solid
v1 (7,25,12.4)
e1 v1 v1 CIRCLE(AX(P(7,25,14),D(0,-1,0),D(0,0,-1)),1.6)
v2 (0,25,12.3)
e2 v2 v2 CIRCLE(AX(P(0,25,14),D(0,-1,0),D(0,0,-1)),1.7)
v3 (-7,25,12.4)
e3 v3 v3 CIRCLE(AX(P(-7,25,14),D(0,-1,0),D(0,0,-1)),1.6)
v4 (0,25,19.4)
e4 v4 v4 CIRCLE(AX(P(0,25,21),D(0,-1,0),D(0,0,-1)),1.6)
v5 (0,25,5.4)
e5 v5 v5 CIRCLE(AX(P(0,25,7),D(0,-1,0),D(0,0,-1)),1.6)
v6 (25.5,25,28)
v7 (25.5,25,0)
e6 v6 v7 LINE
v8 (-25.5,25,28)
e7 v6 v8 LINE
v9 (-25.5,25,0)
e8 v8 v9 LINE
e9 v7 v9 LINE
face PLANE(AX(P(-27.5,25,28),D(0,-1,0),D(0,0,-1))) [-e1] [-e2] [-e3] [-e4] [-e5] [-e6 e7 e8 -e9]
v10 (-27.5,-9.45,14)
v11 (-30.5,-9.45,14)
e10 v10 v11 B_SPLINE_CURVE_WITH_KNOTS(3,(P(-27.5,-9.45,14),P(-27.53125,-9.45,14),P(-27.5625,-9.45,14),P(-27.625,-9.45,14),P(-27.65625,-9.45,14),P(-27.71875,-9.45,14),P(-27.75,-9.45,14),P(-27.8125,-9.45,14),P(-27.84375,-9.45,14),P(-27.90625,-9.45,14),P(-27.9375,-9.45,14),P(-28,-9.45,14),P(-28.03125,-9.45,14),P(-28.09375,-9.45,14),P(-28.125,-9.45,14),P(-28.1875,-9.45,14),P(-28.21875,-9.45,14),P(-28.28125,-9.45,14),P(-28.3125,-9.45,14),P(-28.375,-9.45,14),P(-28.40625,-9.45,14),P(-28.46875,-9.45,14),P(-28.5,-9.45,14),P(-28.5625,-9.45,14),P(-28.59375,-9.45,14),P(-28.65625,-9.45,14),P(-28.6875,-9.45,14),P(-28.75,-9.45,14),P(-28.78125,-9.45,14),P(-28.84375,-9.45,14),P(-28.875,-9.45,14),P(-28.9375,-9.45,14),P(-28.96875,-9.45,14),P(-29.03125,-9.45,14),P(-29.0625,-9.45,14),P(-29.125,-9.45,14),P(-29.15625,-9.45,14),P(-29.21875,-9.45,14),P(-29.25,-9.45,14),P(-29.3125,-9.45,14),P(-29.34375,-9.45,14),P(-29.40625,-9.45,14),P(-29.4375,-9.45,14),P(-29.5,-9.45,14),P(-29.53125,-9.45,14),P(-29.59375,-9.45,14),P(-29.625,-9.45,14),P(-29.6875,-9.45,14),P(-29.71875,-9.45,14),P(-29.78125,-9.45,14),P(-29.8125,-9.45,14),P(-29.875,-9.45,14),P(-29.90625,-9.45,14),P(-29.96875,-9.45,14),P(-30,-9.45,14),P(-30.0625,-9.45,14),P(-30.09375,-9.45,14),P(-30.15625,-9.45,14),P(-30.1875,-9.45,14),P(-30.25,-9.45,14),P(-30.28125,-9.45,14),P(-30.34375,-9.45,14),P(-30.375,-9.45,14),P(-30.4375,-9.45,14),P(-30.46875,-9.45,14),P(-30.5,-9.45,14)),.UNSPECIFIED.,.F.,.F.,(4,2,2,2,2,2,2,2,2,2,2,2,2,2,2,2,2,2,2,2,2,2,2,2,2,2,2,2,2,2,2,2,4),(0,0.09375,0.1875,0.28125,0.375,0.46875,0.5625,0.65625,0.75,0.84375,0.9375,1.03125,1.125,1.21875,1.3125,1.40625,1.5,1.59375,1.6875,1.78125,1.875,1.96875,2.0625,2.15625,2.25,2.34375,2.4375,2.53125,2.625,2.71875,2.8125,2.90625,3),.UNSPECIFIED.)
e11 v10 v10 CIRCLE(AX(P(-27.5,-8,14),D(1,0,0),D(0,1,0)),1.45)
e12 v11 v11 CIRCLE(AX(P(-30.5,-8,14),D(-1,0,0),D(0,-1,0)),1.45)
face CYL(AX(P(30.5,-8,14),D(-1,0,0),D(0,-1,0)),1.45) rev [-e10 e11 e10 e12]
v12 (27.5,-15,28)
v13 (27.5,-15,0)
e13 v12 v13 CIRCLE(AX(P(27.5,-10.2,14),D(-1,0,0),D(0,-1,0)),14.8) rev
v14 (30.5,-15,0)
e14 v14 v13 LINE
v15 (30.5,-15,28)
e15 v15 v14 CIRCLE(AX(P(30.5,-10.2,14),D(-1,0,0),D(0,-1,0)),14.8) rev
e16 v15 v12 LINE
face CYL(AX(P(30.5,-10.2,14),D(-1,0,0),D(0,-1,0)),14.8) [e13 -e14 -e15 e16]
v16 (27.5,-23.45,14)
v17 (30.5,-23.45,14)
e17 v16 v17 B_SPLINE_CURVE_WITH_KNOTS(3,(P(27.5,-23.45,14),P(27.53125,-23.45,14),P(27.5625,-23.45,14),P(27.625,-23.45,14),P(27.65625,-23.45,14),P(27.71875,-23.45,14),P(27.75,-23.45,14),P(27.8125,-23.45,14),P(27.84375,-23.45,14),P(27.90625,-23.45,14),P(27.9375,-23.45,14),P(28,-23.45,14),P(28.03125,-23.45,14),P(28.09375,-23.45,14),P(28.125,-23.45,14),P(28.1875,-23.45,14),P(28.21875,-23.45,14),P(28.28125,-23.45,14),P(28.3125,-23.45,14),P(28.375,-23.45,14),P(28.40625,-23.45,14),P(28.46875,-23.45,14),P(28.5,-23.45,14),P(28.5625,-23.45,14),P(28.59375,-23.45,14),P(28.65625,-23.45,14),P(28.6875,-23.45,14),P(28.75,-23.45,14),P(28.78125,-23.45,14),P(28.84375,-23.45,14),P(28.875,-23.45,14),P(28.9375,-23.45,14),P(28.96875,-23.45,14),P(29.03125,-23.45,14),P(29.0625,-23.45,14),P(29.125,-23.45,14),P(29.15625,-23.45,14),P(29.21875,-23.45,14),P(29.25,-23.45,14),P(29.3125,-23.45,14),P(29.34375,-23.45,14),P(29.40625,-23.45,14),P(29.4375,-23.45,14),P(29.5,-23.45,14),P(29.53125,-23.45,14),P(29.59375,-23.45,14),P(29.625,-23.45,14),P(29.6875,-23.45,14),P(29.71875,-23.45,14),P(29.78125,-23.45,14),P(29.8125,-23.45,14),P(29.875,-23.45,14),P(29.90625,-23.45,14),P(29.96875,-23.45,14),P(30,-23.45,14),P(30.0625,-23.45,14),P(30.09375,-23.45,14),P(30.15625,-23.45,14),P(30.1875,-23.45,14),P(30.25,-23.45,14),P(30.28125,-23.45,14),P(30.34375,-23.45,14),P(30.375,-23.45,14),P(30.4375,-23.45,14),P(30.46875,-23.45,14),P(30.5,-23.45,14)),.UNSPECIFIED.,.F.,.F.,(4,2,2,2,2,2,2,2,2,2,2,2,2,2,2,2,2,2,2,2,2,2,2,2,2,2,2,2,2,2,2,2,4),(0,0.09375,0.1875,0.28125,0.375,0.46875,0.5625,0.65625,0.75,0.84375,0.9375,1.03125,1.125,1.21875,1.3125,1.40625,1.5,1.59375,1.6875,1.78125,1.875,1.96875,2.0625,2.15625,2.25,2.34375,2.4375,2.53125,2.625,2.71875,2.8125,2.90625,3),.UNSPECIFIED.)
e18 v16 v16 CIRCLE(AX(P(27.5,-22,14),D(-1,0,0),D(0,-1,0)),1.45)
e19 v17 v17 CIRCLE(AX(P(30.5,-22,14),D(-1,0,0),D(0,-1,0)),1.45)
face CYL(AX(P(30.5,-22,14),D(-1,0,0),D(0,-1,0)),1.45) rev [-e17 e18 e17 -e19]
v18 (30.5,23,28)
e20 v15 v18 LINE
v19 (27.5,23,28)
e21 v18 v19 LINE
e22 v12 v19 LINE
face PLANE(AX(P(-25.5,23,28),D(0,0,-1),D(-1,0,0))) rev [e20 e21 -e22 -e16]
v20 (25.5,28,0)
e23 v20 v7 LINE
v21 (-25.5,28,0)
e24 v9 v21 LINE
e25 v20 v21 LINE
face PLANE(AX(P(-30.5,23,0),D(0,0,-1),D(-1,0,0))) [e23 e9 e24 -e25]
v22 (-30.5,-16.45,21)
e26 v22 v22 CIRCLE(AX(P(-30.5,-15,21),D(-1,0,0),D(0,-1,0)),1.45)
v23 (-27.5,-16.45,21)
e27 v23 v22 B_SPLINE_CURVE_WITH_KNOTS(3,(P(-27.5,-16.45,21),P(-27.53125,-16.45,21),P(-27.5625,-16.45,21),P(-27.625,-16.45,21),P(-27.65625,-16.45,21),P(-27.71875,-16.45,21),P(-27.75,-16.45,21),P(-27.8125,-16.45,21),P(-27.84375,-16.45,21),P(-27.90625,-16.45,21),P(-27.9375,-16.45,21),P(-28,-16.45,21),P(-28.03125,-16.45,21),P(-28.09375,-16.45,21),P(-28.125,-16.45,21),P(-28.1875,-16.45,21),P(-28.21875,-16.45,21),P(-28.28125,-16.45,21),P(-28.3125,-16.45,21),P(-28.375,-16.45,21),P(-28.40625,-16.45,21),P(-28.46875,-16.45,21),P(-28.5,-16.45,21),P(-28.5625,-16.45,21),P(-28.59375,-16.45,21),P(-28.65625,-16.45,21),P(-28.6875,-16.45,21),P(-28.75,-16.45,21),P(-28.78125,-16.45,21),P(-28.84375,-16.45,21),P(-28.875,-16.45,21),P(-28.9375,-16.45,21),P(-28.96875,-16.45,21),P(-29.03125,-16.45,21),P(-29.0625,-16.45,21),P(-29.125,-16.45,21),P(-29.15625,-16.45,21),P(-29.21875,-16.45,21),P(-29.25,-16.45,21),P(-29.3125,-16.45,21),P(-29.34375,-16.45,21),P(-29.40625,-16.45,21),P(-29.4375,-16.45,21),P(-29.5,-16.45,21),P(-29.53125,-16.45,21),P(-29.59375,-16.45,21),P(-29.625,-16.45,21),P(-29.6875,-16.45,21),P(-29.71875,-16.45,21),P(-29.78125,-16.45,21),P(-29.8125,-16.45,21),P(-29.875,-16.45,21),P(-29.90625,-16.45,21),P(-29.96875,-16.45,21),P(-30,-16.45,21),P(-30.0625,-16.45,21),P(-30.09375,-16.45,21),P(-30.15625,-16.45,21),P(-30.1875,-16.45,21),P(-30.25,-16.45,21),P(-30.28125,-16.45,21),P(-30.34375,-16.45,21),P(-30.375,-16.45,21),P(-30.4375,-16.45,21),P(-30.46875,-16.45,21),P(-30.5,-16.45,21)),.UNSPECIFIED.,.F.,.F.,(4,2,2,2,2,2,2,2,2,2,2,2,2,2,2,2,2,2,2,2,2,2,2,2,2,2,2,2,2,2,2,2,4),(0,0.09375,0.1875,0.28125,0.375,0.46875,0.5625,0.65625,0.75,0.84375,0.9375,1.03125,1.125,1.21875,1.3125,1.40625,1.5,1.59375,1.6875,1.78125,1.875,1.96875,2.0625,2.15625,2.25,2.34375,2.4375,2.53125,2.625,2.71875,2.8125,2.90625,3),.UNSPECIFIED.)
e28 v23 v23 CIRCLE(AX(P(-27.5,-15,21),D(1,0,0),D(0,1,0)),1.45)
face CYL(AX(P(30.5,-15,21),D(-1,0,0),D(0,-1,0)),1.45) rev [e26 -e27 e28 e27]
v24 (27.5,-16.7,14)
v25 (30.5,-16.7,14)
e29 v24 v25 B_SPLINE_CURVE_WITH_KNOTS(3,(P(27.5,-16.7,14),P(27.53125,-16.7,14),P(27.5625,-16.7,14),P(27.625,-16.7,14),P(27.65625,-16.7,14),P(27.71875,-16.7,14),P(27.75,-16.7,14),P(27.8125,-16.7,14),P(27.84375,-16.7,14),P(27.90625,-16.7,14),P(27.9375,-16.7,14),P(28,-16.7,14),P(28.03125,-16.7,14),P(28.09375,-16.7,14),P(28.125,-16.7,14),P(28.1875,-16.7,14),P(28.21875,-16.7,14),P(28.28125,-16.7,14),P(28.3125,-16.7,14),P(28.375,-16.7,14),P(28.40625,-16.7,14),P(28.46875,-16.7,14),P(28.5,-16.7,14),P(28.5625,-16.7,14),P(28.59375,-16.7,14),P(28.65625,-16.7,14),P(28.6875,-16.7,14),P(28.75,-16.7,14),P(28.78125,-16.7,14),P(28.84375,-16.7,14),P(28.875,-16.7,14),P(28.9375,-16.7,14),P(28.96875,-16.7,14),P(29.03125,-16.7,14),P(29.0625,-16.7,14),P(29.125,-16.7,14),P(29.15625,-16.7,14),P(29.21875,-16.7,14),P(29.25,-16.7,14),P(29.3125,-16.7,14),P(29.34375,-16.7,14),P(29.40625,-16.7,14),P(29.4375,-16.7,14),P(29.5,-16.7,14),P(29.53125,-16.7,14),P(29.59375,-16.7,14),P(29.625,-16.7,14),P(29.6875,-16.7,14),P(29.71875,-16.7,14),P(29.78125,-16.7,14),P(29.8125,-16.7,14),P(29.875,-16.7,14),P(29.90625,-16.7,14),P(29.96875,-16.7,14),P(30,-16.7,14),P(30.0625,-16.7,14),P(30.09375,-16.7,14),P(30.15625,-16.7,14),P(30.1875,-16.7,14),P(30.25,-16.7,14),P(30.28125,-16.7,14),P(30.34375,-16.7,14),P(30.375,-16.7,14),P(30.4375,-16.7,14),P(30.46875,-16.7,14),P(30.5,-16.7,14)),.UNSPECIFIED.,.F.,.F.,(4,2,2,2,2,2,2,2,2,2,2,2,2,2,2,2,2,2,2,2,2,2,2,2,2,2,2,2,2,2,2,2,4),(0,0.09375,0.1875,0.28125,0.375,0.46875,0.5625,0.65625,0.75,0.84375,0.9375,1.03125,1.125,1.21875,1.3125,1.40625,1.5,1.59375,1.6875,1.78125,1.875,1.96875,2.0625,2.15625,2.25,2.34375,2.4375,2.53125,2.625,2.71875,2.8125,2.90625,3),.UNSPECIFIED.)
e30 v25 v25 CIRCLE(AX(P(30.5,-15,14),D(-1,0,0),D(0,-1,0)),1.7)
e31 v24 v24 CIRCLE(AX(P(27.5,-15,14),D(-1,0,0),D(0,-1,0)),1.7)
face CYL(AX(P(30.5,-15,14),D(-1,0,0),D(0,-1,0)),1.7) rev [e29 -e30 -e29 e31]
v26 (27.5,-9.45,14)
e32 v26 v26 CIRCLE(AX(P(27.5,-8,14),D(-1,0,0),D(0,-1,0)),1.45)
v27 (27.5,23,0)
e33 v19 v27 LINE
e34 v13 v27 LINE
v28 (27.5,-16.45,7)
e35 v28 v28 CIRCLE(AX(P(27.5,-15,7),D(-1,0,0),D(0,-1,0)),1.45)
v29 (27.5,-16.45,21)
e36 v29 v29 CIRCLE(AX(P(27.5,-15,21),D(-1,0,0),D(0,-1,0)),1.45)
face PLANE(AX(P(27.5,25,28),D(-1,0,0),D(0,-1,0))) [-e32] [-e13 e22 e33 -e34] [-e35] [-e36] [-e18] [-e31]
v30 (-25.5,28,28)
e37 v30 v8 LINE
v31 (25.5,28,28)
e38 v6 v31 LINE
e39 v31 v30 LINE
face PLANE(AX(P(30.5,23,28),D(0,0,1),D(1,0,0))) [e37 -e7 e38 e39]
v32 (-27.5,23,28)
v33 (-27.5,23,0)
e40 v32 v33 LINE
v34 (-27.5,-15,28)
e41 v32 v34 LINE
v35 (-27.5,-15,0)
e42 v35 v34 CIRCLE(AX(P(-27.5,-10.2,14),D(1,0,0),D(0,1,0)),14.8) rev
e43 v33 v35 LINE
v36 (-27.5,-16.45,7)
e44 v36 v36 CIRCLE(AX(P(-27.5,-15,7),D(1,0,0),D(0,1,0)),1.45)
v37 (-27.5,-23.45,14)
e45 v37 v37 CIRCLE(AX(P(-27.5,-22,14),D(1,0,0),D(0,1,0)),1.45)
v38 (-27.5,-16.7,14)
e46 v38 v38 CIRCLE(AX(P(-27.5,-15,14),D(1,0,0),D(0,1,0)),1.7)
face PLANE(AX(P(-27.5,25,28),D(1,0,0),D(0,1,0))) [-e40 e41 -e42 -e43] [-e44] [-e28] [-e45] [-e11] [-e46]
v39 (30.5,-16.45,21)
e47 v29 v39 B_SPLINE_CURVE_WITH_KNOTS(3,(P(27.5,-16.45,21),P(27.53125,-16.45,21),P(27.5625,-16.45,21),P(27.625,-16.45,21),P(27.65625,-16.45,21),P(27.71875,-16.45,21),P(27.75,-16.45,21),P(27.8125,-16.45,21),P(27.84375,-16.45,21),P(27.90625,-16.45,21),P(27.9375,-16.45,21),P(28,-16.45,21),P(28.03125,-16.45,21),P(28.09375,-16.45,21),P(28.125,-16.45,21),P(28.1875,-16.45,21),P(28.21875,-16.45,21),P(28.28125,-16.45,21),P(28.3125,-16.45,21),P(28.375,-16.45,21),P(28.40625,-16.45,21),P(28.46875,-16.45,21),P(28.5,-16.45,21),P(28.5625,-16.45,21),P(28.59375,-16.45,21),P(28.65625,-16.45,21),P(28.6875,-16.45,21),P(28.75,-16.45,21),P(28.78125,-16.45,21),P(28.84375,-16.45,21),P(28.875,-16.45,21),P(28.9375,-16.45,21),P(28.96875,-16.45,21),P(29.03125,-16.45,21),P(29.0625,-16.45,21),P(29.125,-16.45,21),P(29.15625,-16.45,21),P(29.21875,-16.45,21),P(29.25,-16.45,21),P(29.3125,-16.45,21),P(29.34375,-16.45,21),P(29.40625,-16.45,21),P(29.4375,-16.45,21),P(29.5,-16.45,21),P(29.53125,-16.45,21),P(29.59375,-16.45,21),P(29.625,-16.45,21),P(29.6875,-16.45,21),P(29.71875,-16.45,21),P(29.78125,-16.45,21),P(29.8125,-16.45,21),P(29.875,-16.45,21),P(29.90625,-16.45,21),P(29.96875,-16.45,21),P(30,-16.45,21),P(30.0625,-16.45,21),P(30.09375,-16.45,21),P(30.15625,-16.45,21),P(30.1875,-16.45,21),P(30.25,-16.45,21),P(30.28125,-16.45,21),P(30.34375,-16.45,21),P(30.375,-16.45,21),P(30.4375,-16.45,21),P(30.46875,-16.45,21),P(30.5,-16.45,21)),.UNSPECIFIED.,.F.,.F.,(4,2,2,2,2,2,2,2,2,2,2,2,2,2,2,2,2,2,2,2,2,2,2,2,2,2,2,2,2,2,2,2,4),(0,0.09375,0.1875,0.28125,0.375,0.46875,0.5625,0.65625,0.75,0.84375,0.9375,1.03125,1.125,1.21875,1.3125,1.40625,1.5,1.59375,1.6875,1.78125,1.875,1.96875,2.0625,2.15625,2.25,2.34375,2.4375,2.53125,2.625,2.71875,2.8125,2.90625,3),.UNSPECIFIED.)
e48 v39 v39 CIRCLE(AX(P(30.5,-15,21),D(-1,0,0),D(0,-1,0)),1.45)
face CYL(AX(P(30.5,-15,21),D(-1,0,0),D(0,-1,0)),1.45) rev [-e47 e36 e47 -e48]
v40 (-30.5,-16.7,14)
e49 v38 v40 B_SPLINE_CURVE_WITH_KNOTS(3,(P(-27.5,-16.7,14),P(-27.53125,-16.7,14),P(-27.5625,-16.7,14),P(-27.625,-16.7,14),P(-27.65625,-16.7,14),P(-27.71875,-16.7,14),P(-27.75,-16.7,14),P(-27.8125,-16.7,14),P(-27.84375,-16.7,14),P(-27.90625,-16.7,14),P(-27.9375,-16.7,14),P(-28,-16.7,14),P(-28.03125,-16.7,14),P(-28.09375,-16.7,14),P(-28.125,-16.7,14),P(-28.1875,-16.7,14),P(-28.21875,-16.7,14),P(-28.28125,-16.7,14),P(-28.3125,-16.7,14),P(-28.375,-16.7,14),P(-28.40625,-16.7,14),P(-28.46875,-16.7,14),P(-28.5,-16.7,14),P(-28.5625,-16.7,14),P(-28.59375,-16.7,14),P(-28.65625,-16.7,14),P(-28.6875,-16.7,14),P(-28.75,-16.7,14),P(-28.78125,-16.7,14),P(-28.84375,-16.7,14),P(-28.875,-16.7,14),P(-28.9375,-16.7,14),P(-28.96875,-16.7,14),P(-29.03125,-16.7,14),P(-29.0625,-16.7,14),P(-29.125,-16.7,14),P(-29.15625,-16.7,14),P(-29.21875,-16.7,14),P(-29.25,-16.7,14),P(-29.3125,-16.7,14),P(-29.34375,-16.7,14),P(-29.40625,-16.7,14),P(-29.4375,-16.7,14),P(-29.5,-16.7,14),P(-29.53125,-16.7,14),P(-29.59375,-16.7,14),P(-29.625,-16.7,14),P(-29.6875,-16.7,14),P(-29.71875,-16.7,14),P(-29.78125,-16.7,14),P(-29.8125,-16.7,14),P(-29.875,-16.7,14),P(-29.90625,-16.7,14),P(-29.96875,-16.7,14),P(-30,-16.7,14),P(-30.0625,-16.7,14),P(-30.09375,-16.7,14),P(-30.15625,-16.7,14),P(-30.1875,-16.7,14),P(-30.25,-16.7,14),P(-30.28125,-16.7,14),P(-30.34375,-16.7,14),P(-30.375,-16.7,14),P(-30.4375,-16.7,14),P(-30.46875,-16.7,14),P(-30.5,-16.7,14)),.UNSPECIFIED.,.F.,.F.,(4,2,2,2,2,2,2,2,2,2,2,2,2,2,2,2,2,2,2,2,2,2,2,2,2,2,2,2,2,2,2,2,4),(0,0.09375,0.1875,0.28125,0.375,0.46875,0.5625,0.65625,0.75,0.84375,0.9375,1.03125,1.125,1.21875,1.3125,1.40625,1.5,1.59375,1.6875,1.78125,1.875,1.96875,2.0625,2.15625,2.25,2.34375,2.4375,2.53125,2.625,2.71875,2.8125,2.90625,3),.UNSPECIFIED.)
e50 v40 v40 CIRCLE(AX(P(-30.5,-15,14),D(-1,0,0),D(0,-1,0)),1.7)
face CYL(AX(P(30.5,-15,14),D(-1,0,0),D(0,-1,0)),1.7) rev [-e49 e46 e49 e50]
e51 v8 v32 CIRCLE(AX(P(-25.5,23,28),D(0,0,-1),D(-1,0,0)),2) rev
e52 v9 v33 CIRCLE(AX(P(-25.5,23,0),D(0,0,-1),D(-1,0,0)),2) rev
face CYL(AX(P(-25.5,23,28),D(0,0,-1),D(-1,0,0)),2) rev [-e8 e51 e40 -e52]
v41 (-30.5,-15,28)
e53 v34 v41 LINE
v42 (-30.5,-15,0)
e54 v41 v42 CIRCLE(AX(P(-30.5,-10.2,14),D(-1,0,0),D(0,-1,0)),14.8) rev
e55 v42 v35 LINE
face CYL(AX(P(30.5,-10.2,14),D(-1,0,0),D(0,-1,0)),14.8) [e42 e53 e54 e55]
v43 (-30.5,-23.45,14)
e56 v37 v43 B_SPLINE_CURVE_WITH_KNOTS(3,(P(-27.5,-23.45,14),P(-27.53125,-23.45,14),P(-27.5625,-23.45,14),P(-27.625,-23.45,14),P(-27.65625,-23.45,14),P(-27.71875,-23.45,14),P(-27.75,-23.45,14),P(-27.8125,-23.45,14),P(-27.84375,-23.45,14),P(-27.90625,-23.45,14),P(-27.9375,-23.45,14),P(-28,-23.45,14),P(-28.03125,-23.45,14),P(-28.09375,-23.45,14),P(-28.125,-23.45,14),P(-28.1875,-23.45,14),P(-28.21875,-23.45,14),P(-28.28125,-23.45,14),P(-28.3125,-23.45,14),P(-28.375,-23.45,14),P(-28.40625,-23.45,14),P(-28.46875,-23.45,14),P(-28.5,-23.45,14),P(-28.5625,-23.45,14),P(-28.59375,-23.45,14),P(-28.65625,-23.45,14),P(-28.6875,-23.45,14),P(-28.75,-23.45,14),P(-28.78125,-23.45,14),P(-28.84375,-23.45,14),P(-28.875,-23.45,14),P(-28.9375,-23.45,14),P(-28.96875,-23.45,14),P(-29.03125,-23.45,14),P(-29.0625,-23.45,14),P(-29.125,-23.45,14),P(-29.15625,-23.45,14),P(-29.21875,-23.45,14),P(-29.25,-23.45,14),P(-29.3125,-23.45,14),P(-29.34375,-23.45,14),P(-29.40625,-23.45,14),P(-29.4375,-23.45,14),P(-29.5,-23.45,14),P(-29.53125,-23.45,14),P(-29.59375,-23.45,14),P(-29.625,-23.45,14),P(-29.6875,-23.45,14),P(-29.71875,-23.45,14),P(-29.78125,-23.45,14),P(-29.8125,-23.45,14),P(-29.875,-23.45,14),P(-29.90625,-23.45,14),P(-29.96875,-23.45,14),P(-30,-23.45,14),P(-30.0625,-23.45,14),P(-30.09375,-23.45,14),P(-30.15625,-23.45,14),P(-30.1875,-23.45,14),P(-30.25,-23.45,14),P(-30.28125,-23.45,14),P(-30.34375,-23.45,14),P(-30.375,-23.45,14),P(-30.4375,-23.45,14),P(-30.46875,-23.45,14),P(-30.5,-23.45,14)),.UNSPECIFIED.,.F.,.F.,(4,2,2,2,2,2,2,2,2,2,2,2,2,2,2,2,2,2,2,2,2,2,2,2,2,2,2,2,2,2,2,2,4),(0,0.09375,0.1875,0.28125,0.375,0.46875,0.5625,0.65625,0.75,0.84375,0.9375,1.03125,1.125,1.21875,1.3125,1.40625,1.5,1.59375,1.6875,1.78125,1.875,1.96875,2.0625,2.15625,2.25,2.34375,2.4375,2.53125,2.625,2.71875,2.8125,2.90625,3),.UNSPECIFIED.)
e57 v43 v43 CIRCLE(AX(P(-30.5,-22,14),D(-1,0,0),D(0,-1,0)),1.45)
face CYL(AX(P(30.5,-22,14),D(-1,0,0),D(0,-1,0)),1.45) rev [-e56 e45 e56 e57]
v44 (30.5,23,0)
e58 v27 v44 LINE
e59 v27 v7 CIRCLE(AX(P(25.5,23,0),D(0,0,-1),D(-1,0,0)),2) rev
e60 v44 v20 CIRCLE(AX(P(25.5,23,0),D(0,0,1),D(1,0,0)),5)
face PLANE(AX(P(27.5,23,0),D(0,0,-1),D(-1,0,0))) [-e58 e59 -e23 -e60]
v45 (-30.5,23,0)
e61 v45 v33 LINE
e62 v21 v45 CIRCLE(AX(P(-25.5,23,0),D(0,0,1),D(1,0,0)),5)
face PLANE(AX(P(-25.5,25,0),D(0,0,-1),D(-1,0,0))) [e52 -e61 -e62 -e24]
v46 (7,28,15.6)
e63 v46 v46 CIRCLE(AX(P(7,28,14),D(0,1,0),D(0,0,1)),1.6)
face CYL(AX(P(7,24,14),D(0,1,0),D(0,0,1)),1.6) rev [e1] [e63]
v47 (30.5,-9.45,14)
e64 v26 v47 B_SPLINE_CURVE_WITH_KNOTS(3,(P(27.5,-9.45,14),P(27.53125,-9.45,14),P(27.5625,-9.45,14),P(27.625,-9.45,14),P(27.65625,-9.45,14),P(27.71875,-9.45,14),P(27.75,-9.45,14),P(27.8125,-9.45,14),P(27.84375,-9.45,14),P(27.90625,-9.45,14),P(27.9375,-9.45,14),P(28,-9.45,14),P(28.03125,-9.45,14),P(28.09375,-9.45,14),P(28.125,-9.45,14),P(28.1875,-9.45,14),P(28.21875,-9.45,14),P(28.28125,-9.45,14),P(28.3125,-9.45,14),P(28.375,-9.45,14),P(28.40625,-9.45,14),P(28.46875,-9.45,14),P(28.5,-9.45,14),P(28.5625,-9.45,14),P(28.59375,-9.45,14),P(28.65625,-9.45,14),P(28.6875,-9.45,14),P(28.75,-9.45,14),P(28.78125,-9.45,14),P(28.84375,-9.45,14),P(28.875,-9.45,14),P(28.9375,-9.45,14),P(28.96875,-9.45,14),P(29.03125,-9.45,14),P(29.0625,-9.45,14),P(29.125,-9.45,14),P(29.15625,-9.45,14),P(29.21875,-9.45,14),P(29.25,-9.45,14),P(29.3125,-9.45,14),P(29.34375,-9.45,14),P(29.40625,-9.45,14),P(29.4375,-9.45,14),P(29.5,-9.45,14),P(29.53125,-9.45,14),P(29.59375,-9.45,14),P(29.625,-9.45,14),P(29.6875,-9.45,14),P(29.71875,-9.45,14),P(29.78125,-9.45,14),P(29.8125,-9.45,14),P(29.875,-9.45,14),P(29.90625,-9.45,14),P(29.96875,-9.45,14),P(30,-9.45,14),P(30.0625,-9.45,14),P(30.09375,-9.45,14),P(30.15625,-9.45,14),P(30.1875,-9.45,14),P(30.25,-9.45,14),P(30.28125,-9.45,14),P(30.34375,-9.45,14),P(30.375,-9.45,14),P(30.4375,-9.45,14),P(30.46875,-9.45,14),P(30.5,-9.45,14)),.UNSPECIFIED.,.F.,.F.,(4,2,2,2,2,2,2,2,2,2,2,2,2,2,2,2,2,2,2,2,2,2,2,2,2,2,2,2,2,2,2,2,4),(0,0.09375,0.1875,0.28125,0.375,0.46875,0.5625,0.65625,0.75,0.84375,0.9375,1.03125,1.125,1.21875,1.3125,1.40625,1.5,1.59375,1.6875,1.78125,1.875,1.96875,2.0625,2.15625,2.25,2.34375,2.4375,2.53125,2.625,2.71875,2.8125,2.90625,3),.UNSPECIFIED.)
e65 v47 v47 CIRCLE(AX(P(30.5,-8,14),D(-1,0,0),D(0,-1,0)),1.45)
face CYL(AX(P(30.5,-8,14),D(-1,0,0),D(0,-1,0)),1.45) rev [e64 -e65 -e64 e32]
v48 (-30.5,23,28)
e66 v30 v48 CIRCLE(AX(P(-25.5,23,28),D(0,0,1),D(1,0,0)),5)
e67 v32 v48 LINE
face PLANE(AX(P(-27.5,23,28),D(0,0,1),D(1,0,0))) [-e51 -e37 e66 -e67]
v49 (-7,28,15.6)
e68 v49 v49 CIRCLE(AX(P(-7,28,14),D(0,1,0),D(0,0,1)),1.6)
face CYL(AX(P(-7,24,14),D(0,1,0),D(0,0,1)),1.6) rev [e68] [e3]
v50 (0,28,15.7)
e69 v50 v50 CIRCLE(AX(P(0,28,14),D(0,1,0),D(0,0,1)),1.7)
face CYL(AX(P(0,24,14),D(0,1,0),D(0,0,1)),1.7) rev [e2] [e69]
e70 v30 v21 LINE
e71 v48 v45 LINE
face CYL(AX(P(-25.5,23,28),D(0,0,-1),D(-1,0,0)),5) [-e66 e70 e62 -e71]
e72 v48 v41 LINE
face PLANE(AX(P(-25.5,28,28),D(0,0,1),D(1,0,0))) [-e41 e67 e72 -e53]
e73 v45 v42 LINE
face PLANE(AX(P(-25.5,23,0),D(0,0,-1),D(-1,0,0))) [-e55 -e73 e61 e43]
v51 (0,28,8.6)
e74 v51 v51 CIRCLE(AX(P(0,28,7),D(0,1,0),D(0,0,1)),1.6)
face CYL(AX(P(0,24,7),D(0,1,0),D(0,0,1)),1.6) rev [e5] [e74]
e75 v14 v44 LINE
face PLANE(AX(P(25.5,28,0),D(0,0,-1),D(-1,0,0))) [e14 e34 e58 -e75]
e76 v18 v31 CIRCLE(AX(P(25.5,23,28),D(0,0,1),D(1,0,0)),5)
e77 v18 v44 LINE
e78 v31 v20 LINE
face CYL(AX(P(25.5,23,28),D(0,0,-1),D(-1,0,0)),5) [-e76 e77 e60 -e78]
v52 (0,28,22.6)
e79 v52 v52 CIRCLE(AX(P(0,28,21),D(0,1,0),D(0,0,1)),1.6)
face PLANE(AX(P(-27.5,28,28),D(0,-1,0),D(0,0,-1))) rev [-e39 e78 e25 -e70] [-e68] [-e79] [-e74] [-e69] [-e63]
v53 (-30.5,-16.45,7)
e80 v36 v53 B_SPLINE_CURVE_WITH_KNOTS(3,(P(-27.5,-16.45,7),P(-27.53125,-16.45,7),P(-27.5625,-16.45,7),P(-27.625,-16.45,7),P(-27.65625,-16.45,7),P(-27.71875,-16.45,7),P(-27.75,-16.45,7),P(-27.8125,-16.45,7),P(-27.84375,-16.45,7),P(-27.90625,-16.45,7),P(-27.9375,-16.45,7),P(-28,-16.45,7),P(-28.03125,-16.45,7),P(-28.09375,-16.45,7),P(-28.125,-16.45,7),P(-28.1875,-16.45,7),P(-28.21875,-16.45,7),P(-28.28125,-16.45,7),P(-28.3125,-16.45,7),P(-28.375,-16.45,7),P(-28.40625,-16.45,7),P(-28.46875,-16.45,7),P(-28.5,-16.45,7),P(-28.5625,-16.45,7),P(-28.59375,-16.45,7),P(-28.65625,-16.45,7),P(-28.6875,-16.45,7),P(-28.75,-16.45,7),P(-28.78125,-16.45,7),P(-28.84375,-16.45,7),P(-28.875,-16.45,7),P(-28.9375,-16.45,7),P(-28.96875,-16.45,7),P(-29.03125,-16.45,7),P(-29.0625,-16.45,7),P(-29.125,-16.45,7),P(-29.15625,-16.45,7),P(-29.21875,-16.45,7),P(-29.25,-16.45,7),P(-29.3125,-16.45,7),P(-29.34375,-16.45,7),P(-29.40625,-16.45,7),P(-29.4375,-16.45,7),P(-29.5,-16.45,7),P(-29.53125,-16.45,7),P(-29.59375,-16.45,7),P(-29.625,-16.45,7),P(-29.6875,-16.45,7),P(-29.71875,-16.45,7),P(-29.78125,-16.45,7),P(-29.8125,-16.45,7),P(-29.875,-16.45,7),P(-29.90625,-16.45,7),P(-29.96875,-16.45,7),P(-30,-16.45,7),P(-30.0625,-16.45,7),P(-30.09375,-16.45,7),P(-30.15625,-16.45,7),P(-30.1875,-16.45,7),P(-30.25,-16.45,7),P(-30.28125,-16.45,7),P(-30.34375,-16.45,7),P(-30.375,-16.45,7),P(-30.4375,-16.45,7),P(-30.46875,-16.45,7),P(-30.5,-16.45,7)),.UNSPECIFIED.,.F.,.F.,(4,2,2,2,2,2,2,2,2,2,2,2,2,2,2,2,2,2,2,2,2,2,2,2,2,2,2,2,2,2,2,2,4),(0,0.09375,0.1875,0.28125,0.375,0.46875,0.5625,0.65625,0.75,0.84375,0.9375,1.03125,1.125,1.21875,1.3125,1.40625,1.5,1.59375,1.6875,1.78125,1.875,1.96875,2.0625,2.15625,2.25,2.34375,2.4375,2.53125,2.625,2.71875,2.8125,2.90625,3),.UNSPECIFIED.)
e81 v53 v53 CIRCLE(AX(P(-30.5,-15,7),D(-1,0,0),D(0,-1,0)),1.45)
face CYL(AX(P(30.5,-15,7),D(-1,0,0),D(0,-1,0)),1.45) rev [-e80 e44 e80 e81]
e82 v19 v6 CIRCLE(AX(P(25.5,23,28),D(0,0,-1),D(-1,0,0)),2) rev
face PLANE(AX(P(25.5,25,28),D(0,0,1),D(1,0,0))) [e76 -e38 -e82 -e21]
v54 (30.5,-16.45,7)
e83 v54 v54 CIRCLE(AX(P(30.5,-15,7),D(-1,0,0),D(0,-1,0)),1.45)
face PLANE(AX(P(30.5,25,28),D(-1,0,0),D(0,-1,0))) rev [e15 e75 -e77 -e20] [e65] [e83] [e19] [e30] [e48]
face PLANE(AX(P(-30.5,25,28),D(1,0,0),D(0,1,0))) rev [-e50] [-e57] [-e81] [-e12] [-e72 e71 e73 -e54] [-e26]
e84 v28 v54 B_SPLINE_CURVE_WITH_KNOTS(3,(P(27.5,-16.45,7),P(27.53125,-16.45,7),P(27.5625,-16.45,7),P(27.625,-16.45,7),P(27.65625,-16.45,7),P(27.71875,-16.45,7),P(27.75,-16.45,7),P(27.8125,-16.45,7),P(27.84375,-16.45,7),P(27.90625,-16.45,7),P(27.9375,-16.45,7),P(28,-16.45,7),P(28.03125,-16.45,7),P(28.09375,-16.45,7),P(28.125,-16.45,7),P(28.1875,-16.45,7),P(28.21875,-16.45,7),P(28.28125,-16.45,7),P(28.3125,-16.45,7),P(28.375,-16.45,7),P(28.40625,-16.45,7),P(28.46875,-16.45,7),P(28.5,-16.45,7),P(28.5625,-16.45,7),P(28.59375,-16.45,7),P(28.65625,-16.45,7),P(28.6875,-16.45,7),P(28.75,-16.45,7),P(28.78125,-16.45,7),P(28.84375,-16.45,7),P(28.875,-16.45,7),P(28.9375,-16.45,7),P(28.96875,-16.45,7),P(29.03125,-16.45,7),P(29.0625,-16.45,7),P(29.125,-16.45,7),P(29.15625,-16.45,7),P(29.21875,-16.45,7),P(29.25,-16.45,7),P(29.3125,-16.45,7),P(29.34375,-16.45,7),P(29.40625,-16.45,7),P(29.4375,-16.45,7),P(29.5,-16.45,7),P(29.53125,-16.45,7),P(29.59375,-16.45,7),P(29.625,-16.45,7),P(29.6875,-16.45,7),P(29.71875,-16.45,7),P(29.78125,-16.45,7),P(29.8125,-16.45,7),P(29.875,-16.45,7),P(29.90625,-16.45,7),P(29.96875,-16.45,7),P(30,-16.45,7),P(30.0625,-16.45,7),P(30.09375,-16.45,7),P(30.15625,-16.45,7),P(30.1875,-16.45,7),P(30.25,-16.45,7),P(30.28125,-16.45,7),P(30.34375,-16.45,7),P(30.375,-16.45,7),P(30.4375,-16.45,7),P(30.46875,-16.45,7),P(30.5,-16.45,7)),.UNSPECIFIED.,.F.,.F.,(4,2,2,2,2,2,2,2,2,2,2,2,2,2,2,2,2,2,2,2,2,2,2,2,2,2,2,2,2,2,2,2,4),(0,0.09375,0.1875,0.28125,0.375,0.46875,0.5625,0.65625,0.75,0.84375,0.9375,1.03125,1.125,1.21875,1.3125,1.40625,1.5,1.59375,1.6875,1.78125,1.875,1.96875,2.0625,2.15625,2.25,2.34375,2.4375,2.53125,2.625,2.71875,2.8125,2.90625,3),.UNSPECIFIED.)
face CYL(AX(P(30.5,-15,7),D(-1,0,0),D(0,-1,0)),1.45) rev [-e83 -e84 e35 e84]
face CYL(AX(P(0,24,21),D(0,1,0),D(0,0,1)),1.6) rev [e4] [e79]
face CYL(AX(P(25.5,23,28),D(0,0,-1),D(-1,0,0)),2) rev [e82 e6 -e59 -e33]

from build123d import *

# Parameters (mm, degrees)
SM_BASE_FLANGE_2_DEPTH = 28
SKETCH_10_R            = 1.45
SKETCH_10_R_2          = 1.7
CUT_EXTRUDE_1_DEPTH    = 73.725511342
SKETCH_12_R            = 1.6
SKETCH_12_R_2          = 1.7
CUT_EXTRUDE_3_DEPTH    = 4


# Sheet-metal steps are written as plain solids
with BuildPart() as part:
    # 草图1 → 基体-法兰2 (new body)
    with BuildSketch(Plane.XY):
        with BuildLine():
            Line((-27.5, -25), (-27.5, 23))
            ThreePointArc((-27.5, 23), (-26.914213562, 24.414213562), (-25.5, 25))
            Line((-25.5, 25), (25.5, 25))
            ThreePointArc((25.5, 25), (26.914213562, 24.414213562), (27.5, 23))
            Line((27.5, 23), (27.5, -25))
            Line((27.5, -25), (30.5, -25))
            Line((30.5, -25), (30.5, 23))
            ThreePointArc((30.5, 23), (29.035533906, 26.535533906), (25.5, 28))
            Line((25.5, 28), (-25.5, 28))
            ThreePointArc((-25.5, 28), (-29.035533906, 26.535533906), (-30.5, 23))
            Line((-30.5, 23), (-30.5, -25))
            Line((-30.5, -25), (-27.5, -25))
        make_face()
    extrude(amount=SM_BASE_FLANGE_2_DEPTH)

    # 草图10 → 切除-拉伸1 (cut, through all)
    with BuildSketch(Plane.ZY.offset(30.5)):
        with Locations(Location((7, -15, 0), (0, 0, 270))):
            Circle(SKETCH_10_R)
        with Locations(Location((14, -15, 0), (0, 0, 270))):
            Circle(SKETCH_10_R_2)
        with Locations(Location((21, -15, 0), (0, 0, 270))):
            Circle(SKETCH_10_R)
        with Locations(Location((14, -8, 0), (0, 0, 270))):
            Circle(SKETCH_10_R)
        with Locations(Location((14, -22, 0), (0, 0, 270))):
            Circle(SKETCH_10_R)
        with BuildLine():
            Line((0, -25), (14, -25))
            ThreePointArc((14, -25), (5.397674733, -22.243255374), (0, -15))
            Line((0, -15), (0, -25))
        make_face()
        with BuildLine():
            ThreePointArc((28, -15), (22.602325267, -22.243255374), (14, -25))
            Line((14, -25), (28, -25))
            Line((28, -25), (28, -15))
        make_face()
    extrude(amount=-CUT_EXTRUDE_1_DEPTH, mode=Mode.SUBTRACT)

    # 草图12 → 切除-拉伸3 (cut)
    with BuildSketch(Plane(origin=(0, 28, 0), x_dir=(1, 0, 0), z_dir=(0, 1, 0))):
        with Locations(Location((-7, -14, 0), (0, 0, 270))):
            Circle(SKETCH_12_R)
        with Locations(Location((0, -7, 0), (0, 0, 270))):
            Circle(SKETCH_12_R)
        with Locations(Location((7, -14, 0), (0, 0, 270))):
            Circle(SKETCH_12_R)
        with Locations(Location((0, -14, 0), (0, 0, 270))):
            Circle(SKETCH_12_R_2)
        with Locations(Location((0, -21, 0), (0, 0, 270))):
            Circle(SKETCH_12_R)
    extrude(amount=-CUT_EXTRUDE_3_DEPTH, mode=Mode.SUBTRACT)


solid = part.part
